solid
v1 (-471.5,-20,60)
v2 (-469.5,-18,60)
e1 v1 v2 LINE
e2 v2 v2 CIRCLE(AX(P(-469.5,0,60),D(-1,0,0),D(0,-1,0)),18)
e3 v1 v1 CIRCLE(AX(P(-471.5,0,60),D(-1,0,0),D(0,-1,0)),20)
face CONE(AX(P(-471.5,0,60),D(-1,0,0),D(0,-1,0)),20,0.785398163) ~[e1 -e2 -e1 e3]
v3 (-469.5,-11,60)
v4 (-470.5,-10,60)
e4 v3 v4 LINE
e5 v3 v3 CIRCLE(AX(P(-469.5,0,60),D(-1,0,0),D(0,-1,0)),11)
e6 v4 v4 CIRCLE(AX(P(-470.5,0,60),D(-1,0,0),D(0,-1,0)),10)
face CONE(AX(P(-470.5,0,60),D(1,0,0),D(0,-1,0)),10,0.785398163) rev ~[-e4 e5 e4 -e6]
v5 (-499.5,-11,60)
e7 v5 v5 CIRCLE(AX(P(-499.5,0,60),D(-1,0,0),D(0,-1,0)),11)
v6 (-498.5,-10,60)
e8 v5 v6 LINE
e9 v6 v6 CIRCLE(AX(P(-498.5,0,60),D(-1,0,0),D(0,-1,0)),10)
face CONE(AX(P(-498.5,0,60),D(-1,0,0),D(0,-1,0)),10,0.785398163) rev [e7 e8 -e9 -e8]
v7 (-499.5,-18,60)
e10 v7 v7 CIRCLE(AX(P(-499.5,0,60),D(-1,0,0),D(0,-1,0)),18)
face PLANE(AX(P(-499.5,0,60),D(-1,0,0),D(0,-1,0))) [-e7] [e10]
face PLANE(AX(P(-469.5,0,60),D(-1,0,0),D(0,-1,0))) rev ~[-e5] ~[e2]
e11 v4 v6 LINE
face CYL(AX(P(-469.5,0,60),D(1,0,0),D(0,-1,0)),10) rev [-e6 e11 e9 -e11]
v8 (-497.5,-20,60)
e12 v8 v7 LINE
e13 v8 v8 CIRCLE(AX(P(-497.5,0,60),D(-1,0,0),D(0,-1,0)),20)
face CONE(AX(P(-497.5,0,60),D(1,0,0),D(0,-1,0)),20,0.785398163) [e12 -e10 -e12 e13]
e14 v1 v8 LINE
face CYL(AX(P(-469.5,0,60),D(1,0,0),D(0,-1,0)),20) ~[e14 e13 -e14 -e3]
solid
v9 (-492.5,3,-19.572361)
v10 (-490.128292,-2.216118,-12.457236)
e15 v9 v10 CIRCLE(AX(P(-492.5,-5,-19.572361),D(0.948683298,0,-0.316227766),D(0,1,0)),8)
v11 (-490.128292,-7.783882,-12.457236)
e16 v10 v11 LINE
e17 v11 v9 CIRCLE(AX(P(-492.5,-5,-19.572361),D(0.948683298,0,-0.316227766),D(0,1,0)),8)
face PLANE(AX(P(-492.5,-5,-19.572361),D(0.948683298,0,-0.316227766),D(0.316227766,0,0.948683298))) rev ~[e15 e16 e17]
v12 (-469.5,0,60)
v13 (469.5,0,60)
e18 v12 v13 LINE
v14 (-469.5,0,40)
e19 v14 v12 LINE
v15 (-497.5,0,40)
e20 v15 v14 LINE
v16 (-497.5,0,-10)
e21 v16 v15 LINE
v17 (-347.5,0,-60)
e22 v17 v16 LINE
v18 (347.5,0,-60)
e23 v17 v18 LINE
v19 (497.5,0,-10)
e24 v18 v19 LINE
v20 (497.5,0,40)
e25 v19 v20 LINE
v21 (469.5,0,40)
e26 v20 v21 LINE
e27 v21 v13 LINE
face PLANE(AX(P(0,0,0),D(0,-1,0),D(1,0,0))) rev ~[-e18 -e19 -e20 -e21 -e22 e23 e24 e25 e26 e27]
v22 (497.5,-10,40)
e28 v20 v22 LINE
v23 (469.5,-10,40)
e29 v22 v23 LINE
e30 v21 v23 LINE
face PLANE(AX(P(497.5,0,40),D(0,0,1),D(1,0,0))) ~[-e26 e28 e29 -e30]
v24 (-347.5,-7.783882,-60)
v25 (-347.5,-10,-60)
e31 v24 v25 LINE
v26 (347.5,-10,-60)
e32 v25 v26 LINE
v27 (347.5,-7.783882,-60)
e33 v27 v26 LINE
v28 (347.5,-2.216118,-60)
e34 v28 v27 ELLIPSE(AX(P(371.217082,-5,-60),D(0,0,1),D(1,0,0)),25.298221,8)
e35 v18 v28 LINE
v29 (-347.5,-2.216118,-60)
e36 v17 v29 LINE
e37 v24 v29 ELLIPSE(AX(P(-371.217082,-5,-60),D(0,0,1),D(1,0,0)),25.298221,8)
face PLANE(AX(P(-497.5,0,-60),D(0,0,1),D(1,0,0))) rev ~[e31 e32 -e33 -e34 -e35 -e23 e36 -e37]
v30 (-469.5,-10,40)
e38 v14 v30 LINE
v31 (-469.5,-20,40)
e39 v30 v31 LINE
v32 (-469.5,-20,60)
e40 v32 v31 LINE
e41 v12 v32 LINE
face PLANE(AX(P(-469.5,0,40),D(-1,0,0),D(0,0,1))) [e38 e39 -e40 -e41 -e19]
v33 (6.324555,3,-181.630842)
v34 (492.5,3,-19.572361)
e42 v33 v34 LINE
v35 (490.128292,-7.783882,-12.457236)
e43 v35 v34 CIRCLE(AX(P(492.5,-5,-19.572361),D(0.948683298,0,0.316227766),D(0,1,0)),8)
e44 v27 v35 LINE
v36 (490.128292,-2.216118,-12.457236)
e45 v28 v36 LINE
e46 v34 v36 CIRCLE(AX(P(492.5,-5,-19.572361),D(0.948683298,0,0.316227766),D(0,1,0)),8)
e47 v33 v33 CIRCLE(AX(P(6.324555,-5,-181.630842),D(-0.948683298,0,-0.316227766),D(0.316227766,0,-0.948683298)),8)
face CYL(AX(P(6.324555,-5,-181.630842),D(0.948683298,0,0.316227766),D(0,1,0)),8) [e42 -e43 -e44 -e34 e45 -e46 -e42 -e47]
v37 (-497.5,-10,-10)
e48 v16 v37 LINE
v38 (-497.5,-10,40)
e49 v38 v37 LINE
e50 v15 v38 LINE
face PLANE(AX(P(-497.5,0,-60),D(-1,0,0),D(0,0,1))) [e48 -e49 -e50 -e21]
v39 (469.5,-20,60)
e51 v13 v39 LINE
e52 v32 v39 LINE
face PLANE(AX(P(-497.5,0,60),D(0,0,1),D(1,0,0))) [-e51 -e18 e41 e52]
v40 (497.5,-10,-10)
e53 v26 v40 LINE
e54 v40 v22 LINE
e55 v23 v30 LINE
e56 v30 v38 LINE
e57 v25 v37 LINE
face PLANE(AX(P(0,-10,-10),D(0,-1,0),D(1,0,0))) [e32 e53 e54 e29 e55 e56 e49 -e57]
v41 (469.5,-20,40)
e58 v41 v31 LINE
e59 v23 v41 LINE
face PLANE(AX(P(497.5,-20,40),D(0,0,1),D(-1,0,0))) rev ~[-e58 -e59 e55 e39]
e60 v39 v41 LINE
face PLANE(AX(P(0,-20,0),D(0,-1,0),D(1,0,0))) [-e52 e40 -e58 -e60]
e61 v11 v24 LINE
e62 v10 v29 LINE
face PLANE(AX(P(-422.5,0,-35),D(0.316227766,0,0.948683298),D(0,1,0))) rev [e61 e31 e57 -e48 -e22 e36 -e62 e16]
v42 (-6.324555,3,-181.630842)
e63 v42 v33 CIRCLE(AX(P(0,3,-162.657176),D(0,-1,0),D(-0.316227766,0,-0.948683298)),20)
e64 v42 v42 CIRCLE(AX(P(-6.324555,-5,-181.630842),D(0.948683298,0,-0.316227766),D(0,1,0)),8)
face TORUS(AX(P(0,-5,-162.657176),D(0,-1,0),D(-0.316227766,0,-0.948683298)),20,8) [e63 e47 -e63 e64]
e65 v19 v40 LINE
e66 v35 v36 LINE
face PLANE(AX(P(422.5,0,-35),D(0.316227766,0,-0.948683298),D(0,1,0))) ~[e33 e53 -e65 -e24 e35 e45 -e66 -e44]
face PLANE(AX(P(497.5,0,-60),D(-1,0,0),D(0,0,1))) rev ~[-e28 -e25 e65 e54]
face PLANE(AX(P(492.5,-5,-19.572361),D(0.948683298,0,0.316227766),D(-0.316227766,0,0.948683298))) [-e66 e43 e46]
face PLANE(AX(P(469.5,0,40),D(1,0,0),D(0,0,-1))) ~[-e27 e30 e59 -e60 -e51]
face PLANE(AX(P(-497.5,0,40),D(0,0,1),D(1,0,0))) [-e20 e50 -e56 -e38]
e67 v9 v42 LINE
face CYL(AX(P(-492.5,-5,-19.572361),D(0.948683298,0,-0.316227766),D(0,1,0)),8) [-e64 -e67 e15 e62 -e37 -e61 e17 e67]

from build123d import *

# Parameters (mm, degrees)
F0_W      = 995
F0_H      = 120
F1_DEPTH  = 20
F2_W      = 28
F2_H      = 20
F3_DEPTH  = 25
F4_R      = 20
F4_R_2    = 10
F5_DEPTH  = 30
F6_SIZE   = 2
F7_SIZE   = 1
F9_DEPTH  = 10
F10_SIZE2 = 50
F10_SIZE  = 150
F14_R     = 8


# Not quite as in the source:
# - a pattern or mirror of a feature is missing from the dataset's text; its kind, count and spacing are read off the source's solid


with BuildPart() as f1:
    # F0 (on Front) → F1 (new body)
    with BuildSketch(Plane.XZ):
        Rectangle(F0_W, F0_H)
    extrude(amount=F1_DEPTH)

    # F2 (on Front) → F3 (cut)
    with BuildSketch(Plane.XZ):
        with Locations((-483.5, 50)):
            Rectangle(F2_W, F2_H)
    f3 = extrude(amount=F3_DEPTH, mode=Mode.SUBTRACT)

    # F3_copies: F3 across plane
    add(f3.mirror(Plane(origin=(0, 0, 0), x_dir=(0, 0, 1), z_dir=(1, 0, 0))), mode=Mode.SUBTRACT)

    # F8 (on face) → F9 (cut)
    with BuildSketch(Plane.XZ.offset(20)):
        Polygon((-497.5, 40), (-497.5, -60), (497.5, -60), (497.5, 40), (469.5, 40), (-469.5, 40), align=None)
    extrude(amount=-F9_DEPTH, mode=Mode.SUBTRACT)

    # F10
    f10_edges = [f1.edges().sort_by_distance(p)[0] for p in [
        (-497.5, -5, -60),
        (497.5, -5, -60),
    ]]
    f10_side = f1.faces().sort_by_distance((0, -5, -60))[0]
    chamfer(f10_edges, length=F10_SIZE, length2=F10_SIZE2, reference=f10_side)

    # F15: sweep along a path in F12
    with BuildLine(Plane.XZ.offset(5)) as f15_path:
        Line((-492.5, -19.5723608171), (-6.3245553203, -181.630842377))
        ThreePointArc((-6.3245553203, -181.630842377), (0, -182.657176416), (6.3245553203, -181.630842377))
        Line((6.3245553203, -181.630842377), (492.5, -19.5723608171))
    # F14 (on line) → F15 (sweep)
    with BuildSketch(Plane(origin=(-437.3782917549, 0, 145.7927639183), x_dir=(0, 1, 0), z_dir=(0.9486832981, 0, -0.316227766))):
        with Locations((-5, -174.3101465739)):
            Circle(F14_R)
    sweep(path=f15_path.line)


with BuildPart() as f5:
    # F4 (on face) → F5 (new body)
    with BuildSketch(Plane(origin=(-469.5, 0, 0), x_dir=(0, -1, 0), z_dir=(-1, 0, 0))):
        with Locations((0, 60)):
            Circle(F4_R)
        with Locations((0, 60)):
            Circle(F4_R_2, mode=Mode.SUBTRACT)
    extrude(amount=F5_DEPTH)

    # F6
    f6_edges = [f5.edges().sort_by_distance(p)[0] for p in [
        (-469.5, 20, 60),
        (-499.5, 20, 60),
    ]]
    chamfer(f6_edges, length=F6_SIZE)

    # F7
    f7_edges = [f5.edges().sort_by_distance(p)[0] for p in [
        (-469.5, 10, 60),
        (-499.5, 10, 60),
    ]]
    chamfer(f7_edges, length=F7_SIZE)


solid = Compound([f1.part, f5.part])
